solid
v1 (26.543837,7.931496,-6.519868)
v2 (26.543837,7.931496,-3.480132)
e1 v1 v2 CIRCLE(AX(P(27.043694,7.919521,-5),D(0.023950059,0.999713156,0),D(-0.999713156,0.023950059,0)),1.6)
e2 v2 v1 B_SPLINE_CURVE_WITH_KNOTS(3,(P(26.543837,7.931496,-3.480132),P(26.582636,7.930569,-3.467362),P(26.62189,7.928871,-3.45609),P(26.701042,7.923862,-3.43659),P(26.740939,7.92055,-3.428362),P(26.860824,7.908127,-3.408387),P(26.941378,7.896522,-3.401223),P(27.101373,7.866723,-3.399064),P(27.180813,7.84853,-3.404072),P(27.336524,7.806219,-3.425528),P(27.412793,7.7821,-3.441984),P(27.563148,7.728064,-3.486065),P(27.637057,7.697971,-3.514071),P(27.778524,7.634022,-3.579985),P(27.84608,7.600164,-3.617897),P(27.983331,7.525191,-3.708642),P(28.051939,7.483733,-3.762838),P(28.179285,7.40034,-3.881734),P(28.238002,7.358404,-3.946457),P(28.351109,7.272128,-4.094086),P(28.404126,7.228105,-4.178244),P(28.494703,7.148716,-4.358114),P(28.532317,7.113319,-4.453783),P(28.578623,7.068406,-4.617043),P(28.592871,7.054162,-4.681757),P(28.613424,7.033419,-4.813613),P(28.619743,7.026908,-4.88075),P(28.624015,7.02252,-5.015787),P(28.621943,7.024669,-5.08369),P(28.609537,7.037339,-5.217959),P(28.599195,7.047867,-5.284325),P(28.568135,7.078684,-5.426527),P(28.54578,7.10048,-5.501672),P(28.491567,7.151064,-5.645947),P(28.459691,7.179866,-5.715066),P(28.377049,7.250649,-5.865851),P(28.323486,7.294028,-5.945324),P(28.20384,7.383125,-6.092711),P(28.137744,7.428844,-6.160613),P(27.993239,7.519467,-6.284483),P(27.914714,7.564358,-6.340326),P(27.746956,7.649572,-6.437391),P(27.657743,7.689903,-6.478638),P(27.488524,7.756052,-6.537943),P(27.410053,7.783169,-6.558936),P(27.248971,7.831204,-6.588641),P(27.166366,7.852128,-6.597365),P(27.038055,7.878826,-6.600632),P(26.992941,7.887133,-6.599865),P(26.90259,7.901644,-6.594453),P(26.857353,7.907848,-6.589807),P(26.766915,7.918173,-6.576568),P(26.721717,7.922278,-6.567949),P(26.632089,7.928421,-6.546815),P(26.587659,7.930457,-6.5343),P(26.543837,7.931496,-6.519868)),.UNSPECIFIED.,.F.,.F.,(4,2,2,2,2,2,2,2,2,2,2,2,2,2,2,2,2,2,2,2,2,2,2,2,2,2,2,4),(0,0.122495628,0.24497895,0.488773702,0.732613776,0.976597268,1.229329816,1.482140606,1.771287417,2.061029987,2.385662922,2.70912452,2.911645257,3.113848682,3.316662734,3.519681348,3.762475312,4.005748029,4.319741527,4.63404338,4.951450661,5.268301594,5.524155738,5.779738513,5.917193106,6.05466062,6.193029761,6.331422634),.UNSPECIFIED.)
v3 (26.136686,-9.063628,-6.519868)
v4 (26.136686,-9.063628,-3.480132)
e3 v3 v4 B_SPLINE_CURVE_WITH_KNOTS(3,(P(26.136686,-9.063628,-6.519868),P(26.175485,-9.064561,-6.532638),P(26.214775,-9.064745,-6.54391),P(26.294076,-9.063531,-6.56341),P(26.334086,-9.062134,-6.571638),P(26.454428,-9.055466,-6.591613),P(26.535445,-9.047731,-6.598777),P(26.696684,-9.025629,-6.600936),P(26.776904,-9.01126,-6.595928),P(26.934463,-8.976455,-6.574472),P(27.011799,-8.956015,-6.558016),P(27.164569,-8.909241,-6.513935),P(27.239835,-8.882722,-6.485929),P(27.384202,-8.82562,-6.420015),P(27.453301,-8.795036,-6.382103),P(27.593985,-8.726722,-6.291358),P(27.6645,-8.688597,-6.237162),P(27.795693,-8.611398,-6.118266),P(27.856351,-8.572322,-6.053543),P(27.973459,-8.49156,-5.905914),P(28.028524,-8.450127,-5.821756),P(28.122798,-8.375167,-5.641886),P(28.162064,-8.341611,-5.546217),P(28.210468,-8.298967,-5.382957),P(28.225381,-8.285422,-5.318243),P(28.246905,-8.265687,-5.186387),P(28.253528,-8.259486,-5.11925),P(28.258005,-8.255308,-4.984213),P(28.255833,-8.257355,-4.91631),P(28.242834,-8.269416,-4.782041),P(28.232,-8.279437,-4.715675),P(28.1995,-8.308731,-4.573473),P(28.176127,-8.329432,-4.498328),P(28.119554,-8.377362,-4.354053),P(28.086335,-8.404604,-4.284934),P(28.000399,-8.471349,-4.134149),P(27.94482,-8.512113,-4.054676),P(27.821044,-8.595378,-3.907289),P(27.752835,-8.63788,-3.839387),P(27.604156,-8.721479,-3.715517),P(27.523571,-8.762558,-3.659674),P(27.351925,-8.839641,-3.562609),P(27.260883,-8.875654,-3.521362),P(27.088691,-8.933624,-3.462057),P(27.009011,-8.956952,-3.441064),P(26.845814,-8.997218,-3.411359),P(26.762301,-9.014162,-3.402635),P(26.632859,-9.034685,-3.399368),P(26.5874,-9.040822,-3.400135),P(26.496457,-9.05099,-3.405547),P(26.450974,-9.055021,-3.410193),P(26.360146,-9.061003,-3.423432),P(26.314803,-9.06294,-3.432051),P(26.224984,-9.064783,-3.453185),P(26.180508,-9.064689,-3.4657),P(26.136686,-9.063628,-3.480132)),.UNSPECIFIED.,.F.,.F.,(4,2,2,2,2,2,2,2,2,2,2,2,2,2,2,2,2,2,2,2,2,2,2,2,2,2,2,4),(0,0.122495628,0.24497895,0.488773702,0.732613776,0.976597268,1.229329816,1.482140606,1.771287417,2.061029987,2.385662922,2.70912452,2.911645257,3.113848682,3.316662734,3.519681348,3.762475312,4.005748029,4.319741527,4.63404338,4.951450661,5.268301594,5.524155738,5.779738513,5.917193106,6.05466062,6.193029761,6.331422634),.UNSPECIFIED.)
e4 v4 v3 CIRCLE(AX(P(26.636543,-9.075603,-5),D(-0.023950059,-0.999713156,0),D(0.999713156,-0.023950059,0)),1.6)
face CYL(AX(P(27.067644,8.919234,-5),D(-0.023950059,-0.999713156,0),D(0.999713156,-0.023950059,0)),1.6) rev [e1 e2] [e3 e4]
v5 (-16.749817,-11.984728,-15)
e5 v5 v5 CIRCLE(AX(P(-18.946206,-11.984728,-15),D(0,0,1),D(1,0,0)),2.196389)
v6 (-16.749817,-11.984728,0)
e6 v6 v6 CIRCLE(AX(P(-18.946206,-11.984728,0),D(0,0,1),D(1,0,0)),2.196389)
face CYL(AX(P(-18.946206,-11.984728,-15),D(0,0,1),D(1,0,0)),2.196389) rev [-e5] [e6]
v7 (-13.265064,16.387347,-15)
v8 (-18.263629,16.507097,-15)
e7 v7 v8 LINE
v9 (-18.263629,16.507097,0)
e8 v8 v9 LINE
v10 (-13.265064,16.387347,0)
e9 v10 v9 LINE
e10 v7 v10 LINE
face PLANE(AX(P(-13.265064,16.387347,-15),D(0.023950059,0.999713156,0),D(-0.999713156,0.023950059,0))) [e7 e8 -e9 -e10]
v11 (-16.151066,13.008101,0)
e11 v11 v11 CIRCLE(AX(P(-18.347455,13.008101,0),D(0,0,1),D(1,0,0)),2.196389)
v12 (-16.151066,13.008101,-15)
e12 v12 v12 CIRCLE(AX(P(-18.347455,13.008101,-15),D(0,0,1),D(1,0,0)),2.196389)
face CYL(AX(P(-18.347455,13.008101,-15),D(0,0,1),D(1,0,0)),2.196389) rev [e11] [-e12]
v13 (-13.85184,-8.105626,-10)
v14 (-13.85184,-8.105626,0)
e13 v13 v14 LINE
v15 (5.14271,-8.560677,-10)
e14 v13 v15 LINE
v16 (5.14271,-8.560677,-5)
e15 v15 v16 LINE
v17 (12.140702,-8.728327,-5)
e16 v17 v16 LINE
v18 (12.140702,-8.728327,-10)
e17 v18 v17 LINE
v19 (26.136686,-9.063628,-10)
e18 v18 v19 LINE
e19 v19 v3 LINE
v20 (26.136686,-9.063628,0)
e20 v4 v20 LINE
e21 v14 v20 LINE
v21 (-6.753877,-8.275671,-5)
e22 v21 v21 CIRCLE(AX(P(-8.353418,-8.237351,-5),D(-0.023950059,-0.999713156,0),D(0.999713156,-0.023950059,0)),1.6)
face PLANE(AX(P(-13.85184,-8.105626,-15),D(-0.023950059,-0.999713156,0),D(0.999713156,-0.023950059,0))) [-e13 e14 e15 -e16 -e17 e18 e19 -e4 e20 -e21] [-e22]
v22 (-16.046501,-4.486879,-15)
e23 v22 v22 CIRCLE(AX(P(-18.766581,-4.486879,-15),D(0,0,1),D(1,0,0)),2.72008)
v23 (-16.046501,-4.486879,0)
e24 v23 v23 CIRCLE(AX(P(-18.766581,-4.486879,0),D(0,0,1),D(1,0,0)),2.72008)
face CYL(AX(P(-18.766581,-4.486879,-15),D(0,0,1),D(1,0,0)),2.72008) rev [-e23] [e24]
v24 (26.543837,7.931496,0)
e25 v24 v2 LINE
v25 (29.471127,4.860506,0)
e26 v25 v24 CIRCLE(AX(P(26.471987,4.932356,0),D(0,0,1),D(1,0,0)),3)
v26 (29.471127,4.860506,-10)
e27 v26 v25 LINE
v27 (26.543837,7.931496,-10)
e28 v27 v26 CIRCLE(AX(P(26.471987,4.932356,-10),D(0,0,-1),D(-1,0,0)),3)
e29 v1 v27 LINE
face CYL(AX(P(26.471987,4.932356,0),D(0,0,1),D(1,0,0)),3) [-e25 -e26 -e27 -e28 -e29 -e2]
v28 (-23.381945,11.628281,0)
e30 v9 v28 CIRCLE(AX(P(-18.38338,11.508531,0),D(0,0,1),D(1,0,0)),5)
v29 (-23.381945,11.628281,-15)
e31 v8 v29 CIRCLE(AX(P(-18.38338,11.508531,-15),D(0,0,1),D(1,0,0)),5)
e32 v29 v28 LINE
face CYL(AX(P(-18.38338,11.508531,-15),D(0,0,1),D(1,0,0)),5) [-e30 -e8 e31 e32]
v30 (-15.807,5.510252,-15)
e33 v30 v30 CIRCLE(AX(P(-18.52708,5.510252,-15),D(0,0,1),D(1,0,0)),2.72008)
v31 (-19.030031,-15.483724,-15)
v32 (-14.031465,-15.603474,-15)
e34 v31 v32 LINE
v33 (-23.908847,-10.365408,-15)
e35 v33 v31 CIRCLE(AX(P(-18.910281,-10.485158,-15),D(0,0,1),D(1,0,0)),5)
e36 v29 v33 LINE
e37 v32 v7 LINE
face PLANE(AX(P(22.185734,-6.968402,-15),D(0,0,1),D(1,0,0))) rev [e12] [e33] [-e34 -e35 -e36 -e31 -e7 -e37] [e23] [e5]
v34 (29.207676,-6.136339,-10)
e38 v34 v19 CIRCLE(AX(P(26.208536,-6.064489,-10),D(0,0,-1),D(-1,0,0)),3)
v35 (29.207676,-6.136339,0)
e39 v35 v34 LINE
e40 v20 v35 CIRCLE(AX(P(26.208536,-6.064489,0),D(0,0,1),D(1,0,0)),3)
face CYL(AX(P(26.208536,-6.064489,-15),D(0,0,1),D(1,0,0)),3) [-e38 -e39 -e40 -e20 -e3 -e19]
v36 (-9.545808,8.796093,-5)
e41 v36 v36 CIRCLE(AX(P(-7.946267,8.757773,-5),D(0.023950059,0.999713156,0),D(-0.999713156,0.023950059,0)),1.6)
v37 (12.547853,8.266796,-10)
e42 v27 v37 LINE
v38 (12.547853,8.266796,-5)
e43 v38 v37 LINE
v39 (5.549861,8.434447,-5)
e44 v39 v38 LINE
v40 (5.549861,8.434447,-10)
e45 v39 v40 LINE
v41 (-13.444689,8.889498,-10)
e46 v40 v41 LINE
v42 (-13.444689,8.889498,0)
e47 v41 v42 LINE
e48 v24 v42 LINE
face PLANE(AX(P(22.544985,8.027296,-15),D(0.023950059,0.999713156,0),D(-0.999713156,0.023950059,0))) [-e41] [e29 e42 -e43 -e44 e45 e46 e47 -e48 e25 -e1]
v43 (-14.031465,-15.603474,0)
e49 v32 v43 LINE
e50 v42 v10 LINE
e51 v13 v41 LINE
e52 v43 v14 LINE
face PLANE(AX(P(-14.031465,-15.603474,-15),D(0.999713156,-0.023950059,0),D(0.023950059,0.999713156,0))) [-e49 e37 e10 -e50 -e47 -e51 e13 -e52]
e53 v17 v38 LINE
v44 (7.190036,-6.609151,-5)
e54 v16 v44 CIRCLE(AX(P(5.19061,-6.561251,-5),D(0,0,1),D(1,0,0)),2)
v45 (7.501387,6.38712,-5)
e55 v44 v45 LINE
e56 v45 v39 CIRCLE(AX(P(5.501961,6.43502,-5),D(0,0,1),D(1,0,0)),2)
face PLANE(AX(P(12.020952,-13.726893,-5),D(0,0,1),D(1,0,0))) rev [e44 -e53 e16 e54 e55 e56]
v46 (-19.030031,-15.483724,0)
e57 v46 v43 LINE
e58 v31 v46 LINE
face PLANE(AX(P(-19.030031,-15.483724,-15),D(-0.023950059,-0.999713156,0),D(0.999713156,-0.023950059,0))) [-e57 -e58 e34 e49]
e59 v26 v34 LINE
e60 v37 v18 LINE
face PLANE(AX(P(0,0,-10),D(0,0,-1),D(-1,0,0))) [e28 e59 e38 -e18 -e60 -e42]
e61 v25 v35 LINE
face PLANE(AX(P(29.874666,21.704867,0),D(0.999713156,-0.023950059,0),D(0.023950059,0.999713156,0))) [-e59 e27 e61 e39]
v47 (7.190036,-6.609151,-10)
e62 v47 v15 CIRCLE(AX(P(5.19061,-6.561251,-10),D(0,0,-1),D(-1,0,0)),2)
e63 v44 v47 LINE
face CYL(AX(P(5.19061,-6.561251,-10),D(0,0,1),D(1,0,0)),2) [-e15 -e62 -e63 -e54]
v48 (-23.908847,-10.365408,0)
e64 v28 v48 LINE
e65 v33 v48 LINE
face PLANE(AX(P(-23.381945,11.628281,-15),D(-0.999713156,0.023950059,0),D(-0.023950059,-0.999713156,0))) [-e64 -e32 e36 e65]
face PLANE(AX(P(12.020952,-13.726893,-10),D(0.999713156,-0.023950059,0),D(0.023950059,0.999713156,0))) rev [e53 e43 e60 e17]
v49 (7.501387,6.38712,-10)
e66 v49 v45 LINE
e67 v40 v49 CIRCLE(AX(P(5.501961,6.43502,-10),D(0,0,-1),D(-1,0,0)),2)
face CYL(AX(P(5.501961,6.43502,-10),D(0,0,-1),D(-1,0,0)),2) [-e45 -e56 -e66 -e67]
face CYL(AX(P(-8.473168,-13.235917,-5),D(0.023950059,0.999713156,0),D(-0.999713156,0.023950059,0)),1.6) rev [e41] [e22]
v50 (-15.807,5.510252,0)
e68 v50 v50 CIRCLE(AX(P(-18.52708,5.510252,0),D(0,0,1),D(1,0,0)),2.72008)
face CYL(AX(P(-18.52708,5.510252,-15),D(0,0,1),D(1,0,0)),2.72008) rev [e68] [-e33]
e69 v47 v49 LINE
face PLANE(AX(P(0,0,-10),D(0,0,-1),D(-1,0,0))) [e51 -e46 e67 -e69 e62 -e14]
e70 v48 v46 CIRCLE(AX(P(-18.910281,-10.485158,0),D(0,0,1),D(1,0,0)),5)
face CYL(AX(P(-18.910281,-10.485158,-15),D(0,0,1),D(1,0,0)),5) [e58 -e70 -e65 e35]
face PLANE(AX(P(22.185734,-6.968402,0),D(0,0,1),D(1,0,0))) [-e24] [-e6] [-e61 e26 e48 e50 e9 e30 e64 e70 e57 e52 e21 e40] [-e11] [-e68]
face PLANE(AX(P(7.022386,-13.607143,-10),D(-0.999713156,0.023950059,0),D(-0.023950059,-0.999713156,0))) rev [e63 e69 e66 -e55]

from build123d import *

# Parameters (mm, degrees)
EXTRUDE_1_DEPTH     = 15
CUT_EXTRUDE_1_DEPTH = 5
SKETCH_3_R          = 1.6
SKETCH_3_W          = 5
SKETCH_3_H          = 5
CUT_EXTRUDE_2_DEPTH = 22
FILLET_1_R          = 2
SKETCH_4_W          = 9.58124175
SKETCH_4_H          = 10
EXTRUDE_2_DEPTH     = 17
SKETCH_5_R          = 1.6
CUT_EXTRUDE_3_DEPTH = 18
FILLET_2_R          = 3


with BuildPart() as part:
    # 草图1 → 凸台-拉伸1 (new body)
    with BuildSketch(Plane.XY):
        with BuildLine():
            Line((24.185160084, -7.016301696), (24.496510845, 5.979969335))
            ThreePointArc((24.496510845, 5.979969335), (23.944762934, 7.407806858), (22.544984649, 8.027295764))
            Line((22.544984649, 8.027295764), (-13.444688974, 8.889497871))
            Line((-13.444688974, 8.889497871), (-13.265063535, 16.387346543))
            Line((-13.265063535, 16.387346543), (-18.263629316, 16.507096835))
            ThreePointArc((-18.263629316, 16.507096835), (-21.833223125, 15.127727058), (-23.38194539, 11.628281347))
            Line((-23.38194539, 11.628281347), (-23.908846678, -10.36540809))
            ThreePointArc((-23.908846678, -10.36540809), (-22.5294769, -13.935001898), (-19.030031189, -15.483724163))
            Line((-19.030031189, -15.483724163), (-14.031465408, -15.603474456))
            Line((-14.031465408, -15.603474456), (-13.851839969, -8.105625784))
            Line((-13.851839969, -8.105625784), (22.137833654, -8.967827891))
            ThreePointArc((22.137833654, -8.967827891), (23.565671178, -8.41607998), (24.185160084, -7.016301696))
        make_face()
        with BuildLine():
            ThreePointArc((-16.75044735, -12.037331753), (-18.893602347, -9.788969482), (-21.141964619, -11.93212448))
            ThreePointArc((-21.141964619, -11.93212448), (-18.998809621, -14.180486751), (-16.75044735, -12.037331753))
        make_face(mode=Mode.SUBTRACT)
        with BuildLine():
            ThreePointArc((-16.04728092, -4.552025517), (-18.701434473, -1.76757982), (-21.48588017, -4.421733373))
            ThreePointArc((-21.48588017, -4.421733373), (-18.831726617, -7.20617907), (-16.04728092, -4.552025517))
        make_face(mode=Mode.SUBTRACT)
        with BuildLine():
            ThreePointArc((-15.807780335, 5.445106045), (-18.461933888, 8.229551742), (-21.246379585, 5.575398189))
            ThreePointArc((-21.246379585, 5.575398189), (-18.592226032, 2.790952492), (-15.807780335, 5.445106045))
        make_face(mode=Mode.SUBTRACT)
        with BuildLine():
            ThreePointArc((-16.151695887, 12.955497152), (-18.294850884, 15.203859423), (-20.543213156, 13.060704426))
            ThreePointArc((-20.543213156, 13.060704426), (-18.400058158, 10.812342154), (-16.151695887, 12.955497152))
        make_face(mode=Mode.SUBTRACT)
    extrude(amount=-EXTRUDE_1_DEPTH)

    # 草图2 → 切除-拉伸1 (cut)
    with BuildSketch(Plane(origin=(0, 0, -15), x_dir=(-1, 0, 0), z_dir=(0, 0, -1))):
        Polygon((13.444688974, 8.889497871), (13.851839969, -8.105625784), (-33.415838559, -15.121344773), (-27.379501609, 15.743180277), align=None)
    extrude(amount=-CUT_EXTRUDE_1_DEPTH, mode=Mode.SUBTRACT)

    # 草图3 → 切除-拉伸2 (cut)
    with BuildSketch(Plane(origin=(0.205130979, 8.562490084, 0), x_dir=(0.9997131562086496, -0.02395005852477245, 0), z_dir=(0.02395005852477245, 0.9997131562086496, 0))):
        with Locations(Location((21.846263557, 5, 0), (0, 0, 288.209956864))):
            Circle(SKETCH_3_R)
        with Locations(Location((-8.153736443, 5, 0), (0, 0, 180))):
            Circle(SKETCH_3_R)
        with Locations((9.846263557, 7.5)):
            Rectangle(SKETCH_3_W, SKETCH_3_H)
    extrude(amount=-CUT_EXTRUDE_2_DEPTH, mode=Mode.SUBTRACT)

    # 圆角1
    fillet_1_edges = [part.edges().sort_by_distance(p)[0] for p in [
        (7.142136311, -8.608577013, -7.5),
        (7.549287306, 8.386546642, -7.5),
    ]]
    fillet(fillet_1_edges, radius=FILLET_1_R)

    # 草图4 → 凸台-拉伸2 (add)
    with BuildSketch(Plane(origin=(-0.202020016, -8.432633571, 0), x_dir=(0.9997131562086498, -0.023950058524770876, 0), z_dir=(-0.023950058524770876, -0.9997131562086498, 0))):
        with Locations((24.555642682, -5)):
            Rectangle(SKETCH_4_W, SKETCH_4_H)
    extrude(amount=-EXTRUDE_2_DEPTH)

    # 草图5 → 切除-拉伸3 (cut)
    with BuildSketch(Plane(origin=(-0.202020016, -8.432633571, 0), x_dir=(0.9997131562086498, -0.023950058524770876, 0), z_dir=(-0.023950058524770876, -0.9997131562086498, 0))):
        with Locations((26.846263557, -5)):
            Circle(SKETCH_5_R)
    extrude(amount=-CUT_EXTRUDE_3_DEPTH, mode=Mode.SUBTRACT)

    # 圆角2
    # the kernel refuses this fillet: 3 mm, written as the material it takes off along each edge
    with BuildSketch(Plane(origin=(29.135825748, -9.135478301, 7.5), x_dir=(-0.9997131562086498, 0.023950058524770713, 0), z_dir=(0, 0, -1)), Plane(origin=(29.542976743, 7.859645355, 7.5), x_dir=(-0.023950058524770713, -0.9997131562086498, 0), z_dir=(0, 0, -1))) as fillet_2_piece_1:
        with BuildLine():
            CenterArc((FILLET_2_R, FILLET_2_R), FILLET_2_R, 180, 90)
            Line((0, FILLET_2_R), (0, 0))
            Line((0, 0), (FILLET_2_R, 0))
        make_face()
    extrude(amount=25, mode=Mode.SUBTRACT)


solid = part.part
